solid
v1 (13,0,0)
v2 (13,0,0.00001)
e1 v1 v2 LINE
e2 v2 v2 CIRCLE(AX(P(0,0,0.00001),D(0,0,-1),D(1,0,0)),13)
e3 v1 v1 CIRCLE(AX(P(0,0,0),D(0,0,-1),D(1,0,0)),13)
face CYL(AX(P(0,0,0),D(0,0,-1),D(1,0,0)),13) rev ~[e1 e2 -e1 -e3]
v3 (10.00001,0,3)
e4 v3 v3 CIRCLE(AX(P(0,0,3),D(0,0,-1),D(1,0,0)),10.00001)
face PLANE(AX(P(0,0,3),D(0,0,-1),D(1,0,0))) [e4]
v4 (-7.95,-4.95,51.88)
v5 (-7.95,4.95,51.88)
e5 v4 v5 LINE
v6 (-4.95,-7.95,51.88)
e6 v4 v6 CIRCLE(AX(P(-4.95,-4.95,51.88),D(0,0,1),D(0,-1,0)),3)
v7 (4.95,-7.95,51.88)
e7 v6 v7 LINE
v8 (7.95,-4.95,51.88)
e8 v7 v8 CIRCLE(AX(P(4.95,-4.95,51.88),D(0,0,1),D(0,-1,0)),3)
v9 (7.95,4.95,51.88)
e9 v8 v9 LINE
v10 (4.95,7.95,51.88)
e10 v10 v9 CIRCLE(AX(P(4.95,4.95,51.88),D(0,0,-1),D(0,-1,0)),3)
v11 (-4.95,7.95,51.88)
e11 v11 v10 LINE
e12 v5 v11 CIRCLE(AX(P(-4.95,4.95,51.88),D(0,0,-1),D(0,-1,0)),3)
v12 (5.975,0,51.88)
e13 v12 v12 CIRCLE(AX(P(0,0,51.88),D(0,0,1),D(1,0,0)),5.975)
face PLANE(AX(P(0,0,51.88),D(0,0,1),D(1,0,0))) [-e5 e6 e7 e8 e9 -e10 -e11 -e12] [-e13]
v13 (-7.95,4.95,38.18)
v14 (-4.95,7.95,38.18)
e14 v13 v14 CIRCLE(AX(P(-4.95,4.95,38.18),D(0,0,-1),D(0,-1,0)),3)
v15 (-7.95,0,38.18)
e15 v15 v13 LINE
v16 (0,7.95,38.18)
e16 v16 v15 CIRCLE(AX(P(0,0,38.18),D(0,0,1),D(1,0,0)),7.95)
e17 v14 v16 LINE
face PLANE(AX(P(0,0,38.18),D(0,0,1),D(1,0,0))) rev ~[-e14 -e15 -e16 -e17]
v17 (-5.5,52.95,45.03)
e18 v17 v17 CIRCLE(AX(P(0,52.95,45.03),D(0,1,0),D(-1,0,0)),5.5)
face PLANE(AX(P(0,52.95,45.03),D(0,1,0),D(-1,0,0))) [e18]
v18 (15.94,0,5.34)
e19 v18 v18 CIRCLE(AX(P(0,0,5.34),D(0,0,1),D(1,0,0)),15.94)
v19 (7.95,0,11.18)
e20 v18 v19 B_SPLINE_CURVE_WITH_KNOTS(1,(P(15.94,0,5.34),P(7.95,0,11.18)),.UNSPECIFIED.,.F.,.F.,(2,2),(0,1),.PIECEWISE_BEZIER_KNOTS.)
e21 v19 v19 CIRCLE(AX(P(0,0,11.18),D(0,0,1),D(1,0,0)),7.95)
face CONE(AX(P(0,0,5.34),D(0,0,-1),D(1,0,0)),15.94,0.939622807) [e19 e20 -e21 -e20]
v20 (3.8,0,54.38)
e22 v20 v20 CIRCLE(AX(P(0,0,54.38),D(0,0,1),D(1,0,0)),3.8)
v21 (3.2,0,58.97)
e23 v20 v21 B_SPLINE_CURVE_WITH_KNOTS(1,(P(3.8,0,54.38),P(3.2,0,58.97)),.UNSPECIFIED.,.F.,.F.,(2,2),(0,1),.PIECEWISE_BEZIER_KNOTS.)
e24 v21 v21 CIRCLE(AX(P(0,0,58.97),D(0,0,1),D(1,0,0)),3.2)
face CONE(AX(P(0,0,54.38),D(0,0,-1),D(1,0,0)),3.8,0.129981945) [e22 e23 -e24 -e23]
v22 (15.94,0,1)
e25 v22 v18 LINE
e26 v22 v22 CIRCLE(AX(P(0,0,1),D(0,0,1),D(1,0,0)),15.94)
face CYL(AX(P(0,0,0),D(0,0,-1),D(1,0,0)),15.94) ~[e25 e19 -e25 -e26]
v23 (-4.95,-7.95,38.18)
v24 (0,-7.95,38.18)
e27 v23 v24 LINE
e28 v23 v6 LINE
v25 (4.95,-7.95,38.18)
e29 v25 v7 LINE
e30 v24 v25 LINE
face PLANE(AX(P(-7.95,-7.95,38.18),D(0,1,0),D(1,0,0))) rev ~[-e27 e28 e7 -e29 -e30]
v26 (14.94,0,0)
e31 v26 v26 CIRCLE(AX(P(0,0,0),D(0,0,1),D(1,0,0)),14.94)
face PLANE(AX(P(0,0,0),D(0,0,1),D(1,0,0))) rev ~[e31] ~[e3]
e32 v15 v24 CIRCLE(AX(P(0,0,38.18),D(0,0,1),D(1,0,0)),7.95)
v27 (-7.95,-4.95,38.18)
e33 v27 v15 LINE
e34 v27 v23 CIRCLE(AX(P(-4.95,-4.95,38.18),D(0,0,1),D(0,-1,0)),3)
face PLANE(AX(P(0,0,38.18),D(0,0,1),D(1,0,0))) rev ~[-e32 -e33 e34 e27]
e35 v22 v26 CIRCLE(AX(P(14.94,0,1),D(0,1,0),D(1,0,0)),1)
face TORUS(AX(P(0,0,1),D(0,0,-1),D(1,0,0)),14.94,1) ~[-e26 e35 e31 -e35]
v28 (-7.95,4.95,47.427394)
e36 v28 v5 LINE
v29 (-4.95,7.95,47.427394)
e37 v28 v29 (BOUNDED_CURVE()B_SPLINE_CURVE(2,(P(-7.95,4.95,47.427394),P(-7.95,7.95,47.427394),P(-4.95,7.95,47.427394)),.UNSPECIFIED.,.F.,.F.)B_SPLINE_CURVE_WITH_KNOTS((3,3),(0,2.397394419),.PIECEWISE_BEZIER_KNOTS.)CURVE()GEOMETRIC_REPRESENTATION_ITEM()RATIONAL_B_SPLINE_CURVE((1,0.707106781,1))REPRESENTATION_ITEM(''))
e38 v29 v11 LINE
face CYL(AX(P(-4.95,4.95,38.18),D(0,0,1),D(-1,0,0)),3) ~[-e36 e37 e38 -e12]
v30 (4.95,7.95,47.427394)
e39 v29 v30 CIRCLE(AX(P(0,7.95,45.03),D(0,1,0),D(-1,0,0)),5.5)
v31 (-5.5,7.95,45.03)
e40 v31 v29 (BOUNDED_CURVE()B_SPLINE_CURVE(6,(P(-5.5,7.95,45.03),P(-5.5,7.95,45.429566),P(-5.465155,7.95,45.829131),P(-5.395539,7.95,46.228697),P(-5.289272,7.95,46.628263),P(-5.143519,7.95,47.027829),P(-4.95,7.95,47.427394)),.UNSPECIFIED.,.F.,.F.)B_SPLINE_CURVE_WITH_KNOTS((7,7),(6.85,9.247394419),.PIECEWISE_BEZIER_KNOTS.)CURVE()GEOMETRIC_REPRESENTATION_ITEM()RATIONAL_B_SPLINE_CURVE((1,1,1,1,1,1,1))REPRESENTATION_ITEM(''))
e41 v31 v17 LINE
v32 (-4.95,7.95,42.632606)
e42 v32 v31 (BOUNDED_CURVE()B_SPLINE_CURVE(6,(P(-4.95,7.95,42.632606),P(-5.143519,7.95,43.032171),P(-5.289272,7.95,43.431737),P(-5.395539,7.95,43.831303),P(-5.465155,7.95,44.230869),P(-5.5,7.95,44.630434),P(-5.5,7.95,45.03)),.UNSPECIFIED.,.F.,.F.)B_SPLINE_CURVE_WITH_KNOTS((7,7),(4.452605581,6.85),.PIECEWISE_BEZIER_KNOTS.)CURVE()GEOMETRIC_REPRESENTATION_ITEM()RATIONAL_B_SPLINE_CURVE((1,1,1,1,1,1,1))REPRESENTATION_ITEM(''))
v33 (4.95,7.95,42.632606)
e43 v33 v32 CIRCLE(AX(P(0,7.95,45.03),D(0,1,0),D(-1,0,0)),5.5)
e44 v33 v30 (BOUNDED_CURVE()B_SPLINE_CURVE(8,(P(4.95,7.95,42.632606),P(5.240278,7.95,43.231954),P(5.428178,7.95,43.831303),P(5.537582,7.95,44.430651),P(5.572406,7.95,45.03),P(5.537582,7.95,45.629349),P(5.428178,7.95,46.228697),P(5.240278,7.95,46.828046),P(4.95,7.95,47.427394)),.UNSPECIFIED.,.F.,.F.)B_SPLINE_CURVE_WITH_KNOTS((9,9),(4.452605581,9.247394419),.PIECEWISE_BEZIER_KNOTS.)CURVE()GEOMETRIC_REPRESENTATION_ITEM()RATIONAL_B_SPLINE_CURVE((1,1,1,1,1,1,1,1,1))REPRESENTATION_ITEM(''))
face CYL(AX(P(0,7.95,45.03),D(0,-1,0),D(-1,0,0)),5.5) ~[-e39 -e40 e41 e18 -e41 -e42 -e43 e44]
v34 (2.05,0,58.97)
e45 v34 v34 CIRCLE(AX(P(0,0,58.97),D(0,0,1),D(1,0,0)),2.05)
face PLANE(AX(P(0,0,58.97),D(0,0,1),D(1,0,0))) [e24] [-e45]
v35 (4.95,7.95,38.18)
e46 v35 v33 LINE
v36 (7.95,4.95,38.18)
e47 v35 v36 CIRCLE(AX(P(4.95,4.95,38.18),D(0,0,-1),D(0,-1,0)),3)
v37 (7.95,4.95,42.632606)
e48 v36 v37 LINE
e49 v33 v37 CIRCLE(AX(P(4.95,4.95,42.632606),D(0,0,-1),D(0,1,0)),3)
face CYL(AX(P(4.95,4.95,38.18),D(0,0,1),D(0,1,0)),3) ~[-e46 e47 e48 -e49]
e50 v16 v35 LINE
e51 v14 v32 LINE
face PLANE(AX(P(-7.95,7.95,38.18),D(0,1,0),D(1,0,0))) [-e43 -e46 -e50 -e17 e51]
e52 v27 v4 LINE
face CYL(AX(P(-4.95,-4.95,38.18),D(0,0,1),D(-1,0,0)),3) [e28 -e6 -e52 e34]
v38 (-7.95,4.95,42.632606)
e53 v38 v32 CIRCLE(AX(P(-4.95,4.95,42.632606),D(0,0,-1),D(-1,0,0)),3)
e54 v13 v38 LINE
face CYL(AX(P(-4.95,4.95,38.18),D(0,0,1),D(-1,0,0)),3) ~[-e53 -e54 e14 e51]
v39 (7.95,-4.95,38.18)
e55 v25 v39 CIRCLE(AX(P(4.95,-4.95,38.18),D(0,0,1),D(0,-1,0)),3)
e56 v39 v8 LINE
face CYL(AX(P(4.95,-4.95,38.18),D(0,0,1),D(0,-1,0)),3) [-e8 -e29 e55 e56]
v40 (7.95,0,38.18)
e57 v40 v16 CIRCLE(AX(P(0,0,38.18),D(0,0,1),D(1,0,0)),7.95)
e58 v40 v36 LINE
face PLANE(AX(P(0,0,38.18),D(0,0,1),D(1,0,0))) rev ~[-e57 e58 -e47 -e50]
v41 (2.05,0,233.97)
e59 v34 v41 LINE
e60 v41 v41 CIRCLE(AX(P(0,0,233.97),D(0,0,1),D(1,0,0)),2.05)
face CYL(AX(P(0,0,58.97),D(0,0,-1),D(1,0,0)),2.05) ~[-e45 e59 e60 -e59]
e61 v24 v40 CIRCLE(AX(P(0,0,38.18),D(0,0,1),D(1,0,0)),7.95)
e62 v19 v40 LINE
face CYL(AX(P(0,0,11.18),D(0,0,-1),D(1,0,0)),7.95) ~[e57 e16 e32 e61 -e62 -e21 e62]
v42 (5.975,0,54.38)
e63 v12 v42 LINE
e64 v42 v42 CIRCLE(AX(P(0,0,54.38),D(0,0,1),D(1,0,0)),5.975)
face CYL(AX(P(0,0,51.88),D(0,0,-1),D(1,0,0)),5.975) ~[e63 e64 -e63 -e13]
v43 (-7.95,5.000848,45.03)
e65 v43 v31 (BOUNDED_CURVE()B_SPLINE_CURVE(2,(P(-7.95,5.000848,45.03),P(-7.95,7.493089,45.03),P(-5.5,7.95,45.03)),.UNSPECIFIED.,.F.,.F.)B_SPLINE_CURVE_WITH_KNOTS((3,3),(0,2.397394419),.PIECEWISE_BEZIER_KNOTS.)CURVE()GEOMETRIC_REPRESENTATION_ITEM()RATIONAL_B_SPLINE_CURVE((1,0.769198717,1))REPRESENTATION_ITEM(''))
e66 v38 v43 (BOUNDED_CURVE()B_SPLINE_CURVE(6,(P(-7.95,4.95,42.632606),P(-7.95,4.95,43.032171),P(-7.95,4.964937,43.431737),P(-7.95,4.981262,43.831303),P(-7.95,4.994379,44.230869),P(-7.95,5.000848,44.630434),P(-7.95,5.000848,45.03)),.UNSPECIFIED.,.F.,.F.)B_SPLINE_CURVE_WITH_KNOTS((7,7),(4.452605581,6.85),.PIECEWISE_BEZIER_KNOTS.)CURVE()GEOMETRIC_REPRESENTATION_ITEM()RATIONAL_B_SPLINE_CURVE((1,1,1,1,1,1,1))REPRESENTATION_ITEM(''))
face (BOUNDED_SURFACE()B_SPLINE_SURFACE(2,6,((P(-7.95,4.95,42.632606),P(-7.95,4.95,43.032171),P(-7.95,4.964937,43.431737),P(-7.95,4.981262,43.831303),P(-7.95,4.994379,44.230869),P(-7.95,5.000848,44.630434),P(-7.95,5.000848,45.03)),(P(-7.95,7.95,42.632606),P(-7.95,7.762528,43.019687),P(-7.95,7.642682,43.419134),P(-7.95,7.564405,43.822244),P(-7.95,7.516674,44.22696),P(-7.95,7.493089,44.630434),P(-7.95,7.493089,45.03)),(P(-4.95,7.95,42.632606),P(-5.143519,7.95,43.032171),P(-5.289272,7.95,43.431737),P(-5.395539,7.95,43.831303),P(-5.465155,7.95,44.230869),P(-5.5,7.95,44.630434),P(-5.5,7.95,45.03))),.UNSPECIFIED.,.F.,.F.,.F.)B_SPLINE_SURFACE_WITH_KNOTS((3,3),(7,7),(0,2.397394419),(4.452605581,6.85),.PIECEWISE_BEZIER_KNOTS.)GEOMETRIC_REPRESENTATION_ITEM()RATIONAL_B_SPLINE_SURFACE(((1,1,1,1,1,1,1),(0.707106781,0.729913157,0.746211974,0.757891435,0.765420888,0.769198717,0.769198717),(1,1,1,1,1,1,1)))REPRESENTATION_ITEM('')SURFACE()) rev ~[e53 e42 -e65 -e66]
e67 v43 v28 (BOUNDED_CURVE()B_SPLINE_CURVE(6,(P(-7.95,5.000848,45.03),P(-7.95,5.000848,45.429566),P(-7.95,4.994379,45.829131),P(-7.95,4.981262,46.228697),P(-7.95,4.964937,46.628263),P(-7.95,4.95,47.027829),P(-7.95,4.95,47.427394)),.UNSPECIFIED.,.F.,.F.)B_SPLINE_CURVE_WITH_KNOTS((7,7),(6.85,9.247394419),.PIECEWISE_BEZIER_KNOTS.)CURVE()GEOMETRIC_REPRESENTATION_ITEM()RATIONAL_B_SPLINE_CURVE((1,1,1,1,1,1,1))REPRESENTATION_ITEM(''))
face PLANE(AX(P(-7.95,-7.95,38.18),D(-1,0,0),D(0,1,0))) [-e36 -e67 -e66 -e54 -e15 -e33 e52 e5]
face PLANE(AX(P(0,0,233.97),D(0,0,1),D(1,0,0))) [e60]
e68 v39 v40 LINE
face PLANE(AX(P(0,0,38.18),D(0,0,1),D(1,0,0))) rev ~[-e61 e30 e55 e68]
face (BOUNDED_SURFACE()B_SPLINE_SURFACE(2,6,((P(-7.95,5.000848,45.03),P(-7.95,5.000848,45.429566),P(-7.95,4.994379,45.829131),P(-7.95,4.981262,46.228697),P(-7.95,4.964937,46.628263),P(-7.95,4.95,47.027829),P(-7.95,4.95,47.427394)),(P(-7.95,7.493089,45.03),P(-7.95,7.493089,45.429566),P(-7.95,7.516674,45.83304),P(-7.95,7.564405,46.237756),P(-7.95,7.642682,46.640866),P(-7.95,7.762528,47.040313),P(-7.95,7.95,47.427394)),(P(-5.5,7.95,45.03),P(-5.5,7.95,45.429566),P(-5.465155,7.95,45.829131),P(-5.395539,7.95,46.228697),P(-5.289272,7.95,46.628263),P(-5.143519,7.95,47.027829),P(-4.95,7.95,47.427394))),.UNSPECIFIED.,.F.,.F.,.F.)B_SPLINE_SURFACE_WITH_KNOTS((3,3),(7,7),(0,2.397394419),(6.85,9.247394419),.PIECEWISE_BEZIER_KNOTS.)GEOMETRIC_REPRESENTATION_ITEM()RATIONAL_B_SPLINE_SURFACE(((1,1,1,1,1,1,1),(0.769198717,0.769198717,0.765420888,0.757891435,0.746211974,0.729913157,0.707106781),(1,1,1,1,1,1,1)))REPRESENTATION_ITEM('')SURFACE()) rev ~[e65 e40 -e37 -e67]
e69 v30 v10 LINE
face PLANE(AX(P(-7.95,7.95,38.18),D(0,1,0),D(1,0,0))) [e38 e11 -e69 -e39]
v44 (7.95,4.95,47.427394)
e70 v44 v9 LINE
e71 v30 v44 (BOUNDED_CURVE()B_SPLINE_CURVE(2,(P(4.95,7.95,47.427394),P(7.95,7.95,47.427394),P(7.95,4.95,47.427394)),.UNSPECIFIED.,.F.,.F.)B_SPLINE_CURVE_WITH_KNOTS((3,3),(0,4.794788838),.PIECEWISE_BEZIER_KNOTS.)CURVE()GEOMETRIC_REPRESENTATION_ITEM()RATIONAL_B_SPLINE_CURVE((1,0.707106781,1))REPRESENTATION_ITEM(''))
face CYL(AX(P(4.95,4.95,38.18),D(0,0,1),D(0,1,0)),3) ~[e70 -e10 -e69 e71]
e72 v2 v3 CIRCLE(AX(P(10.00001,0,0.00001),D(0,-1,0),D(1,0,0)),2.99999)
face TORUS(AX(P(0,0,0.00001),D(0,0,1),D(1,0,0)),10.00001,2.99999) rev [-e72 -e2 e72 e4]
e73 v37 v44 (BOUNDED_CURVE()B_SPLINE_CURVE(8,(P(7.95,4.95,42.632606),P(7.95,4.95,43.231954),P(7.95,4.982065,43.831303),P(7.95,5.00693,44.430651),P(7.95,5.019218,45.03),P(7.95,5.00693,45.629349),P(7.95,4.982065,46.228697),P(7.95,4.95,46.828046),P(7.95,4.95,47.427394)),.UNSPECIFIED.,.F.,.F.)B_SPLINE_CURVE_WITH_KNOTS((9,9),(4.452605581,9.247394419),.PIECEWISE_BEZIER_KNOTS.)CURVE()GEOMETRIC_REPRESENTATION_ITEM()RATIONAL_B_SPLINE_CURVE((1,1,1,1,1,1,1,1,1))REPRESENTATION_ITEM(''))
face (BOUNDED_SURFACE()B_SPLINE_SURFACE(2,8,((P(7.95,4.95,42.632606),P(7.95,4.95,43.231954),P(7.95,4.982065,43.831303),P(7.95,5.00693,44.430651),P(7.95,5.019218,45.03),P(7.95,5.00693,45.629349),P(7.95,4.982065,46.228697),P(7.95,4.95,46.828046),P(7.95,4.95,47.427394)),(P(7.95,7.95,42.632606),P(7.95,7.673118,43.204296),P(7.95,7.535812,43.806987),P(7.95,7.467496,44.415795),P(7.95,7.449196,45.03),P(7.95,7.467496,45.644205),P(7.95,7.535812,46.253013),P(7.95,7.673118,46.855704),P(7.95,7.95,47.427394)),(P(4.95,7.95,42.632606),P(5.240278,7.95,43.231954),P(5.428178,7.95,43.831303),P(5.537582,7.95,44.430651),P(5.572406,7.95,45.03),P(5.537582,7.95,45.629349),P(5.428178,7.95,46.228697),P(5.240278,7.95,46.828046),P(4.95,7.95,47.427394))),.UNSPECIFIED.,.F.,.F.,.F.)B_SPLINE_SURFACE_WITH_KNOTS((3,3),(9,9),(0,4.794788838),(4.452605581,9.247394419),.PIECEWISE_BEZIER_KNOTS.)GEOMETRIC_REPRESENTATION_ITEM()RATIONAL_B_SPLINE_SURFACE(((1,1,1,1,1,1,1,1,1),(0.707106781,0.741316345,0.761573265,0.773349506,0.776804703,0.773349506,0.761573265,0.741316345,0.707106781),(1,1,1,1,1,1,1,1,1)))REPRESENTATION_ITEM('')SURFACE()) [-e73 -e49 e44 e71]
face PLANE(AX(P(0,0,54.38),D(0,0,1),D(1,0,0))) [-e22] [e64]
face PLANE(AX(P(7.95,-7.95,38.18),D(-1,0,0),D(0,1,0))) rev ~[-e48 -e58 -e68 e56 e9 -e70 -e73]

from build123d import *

# Parameters (mm, degrees)
F0_R      = 15.94
F1_DEPTH  = 5.34
F1_FACE_R = 15.94
F3_R      = 7.95
F5_DEPTH  = 27
F7_W      = 15.9
F7_H      = 15.9
F8_DEPTH  = 13.7
F10_R     = 5.5
F11_DEPTH = 45
F13_R     = 5.975
F14_DEPTH = 2.5
F16_R     = 3.8
F18_R     = 3.2
F21_R     = 2.05
F22_DEPTH = 175
F23_R     = 3
F24_R     = 1
F26_R     = 13
F27_DEPTH = 3
F28_R     = 2.99999


# Not quite as in the source:
# - a fillet or chamfer is up to 0.001 mm smaller than in the source, because OpenCascade refuses the exact size


with BuildPart() as f1:
    # F0 (on Top) → F1 (new body)
    with BuildSketch(Plane.XY):
        Circle(F0_R)
    extrude(amount=F1_DEPTH)

    # F1_face (on face) → F4 section 0
    with BuildSketch(Plane.XY.offset(5.34)):
        Circle(F1_FACE_R)
    # F3 (on offset) → F4 section 1
    with BuildSketch(Plane.XY.offset(11.18)):
        Circle(F3_R)
    loft()

    # F5 (add): a face of the model
    f5_faces = [f1.faces().sort_by_distance(p)[0] for p in [
        (0, 0, 11.18),
    ]]
    extrude(f5_faces, amount=F5_DEPTH)

    # F7 (on offset) → F8 (join)
    with BuildSketch(Plane.XY.offset(38.18)):
        Rectangle(F7_W, F7_H)
    extrude(amount=F8_DEPTH)

    # F10 (on offset) → F11 (join)
    with BuildSketch(Plane(origin=(0, 7.95, 0), x_dir=(-1, 0, 0), z_dir=(0, 1, 0))):
        with Locations((0, 45.03)):
            Circle(F10_R)
    extrude(amount=F11_DEPTH)

    # F13 (on offset) → F14 (join)
    with BuildSketch(Plane.XY.offset(51.88)):
        Circle(F13_R)
    extrude(amount=F14_DEPTH)

    # F16 (on offset) → F19 section 0
    with BuildSketch(Plane.XY.offset(54.38)):
        Circle(F16_R)
    # F18 (on offset) → F19 section 1
    with BuildSketch(Plane.XY.offset(58.97)):
        Circle(F18_R)
    loft()

    # F21 (on offset) → F22 (join)
    with BuildSketch(Plane.XY.offset(58.97)):
        Circle(F21_R)
    extrude(amount=F22_DEPTH)

    # F23
    f23_edges = [f1.edges().sort_by_distance(p)[0] for p in [
        (-7.95, -7.95, 45.03),
        (-7.95, 7.95, 45.03),
        (7.95, -7.95, 45.03),
        (7.95, 7.95, 45.03),
    ]]
    fillet(f23_edges, radius=F23_R)

    # F24
    f24_edges = [f1.edges().sort_by_distance(p)[0] for p in [
        (-15.94, 0, 0),
    ]]
    fillet(f24_edges, radius=F24_R)

    # F26 (on offset) → F27 (cut)
    with BuildSketch(Plane(origin=(0, 0, 0), x_dir=(1, 0, 0), z_dir=(0, 0, -1))):
        Circle(F26_R)
    extrude(amount=-F27_DEPTH, mode=Mode.SUBTRACT)

    # F28 (radius 3 in the source; OpenCascade refuses exactly that, so slightly less here)
    f28_edges = [f1.edges().sort_by_distance(p)[0] for p in [
        (-13, 0, 3),
    ]]
    fillet(f28_edges, radius=F28_R)


with BuildPart() as f29_1:
    # F29: copy of F1
    add(f1.part)


solid = f1.part
